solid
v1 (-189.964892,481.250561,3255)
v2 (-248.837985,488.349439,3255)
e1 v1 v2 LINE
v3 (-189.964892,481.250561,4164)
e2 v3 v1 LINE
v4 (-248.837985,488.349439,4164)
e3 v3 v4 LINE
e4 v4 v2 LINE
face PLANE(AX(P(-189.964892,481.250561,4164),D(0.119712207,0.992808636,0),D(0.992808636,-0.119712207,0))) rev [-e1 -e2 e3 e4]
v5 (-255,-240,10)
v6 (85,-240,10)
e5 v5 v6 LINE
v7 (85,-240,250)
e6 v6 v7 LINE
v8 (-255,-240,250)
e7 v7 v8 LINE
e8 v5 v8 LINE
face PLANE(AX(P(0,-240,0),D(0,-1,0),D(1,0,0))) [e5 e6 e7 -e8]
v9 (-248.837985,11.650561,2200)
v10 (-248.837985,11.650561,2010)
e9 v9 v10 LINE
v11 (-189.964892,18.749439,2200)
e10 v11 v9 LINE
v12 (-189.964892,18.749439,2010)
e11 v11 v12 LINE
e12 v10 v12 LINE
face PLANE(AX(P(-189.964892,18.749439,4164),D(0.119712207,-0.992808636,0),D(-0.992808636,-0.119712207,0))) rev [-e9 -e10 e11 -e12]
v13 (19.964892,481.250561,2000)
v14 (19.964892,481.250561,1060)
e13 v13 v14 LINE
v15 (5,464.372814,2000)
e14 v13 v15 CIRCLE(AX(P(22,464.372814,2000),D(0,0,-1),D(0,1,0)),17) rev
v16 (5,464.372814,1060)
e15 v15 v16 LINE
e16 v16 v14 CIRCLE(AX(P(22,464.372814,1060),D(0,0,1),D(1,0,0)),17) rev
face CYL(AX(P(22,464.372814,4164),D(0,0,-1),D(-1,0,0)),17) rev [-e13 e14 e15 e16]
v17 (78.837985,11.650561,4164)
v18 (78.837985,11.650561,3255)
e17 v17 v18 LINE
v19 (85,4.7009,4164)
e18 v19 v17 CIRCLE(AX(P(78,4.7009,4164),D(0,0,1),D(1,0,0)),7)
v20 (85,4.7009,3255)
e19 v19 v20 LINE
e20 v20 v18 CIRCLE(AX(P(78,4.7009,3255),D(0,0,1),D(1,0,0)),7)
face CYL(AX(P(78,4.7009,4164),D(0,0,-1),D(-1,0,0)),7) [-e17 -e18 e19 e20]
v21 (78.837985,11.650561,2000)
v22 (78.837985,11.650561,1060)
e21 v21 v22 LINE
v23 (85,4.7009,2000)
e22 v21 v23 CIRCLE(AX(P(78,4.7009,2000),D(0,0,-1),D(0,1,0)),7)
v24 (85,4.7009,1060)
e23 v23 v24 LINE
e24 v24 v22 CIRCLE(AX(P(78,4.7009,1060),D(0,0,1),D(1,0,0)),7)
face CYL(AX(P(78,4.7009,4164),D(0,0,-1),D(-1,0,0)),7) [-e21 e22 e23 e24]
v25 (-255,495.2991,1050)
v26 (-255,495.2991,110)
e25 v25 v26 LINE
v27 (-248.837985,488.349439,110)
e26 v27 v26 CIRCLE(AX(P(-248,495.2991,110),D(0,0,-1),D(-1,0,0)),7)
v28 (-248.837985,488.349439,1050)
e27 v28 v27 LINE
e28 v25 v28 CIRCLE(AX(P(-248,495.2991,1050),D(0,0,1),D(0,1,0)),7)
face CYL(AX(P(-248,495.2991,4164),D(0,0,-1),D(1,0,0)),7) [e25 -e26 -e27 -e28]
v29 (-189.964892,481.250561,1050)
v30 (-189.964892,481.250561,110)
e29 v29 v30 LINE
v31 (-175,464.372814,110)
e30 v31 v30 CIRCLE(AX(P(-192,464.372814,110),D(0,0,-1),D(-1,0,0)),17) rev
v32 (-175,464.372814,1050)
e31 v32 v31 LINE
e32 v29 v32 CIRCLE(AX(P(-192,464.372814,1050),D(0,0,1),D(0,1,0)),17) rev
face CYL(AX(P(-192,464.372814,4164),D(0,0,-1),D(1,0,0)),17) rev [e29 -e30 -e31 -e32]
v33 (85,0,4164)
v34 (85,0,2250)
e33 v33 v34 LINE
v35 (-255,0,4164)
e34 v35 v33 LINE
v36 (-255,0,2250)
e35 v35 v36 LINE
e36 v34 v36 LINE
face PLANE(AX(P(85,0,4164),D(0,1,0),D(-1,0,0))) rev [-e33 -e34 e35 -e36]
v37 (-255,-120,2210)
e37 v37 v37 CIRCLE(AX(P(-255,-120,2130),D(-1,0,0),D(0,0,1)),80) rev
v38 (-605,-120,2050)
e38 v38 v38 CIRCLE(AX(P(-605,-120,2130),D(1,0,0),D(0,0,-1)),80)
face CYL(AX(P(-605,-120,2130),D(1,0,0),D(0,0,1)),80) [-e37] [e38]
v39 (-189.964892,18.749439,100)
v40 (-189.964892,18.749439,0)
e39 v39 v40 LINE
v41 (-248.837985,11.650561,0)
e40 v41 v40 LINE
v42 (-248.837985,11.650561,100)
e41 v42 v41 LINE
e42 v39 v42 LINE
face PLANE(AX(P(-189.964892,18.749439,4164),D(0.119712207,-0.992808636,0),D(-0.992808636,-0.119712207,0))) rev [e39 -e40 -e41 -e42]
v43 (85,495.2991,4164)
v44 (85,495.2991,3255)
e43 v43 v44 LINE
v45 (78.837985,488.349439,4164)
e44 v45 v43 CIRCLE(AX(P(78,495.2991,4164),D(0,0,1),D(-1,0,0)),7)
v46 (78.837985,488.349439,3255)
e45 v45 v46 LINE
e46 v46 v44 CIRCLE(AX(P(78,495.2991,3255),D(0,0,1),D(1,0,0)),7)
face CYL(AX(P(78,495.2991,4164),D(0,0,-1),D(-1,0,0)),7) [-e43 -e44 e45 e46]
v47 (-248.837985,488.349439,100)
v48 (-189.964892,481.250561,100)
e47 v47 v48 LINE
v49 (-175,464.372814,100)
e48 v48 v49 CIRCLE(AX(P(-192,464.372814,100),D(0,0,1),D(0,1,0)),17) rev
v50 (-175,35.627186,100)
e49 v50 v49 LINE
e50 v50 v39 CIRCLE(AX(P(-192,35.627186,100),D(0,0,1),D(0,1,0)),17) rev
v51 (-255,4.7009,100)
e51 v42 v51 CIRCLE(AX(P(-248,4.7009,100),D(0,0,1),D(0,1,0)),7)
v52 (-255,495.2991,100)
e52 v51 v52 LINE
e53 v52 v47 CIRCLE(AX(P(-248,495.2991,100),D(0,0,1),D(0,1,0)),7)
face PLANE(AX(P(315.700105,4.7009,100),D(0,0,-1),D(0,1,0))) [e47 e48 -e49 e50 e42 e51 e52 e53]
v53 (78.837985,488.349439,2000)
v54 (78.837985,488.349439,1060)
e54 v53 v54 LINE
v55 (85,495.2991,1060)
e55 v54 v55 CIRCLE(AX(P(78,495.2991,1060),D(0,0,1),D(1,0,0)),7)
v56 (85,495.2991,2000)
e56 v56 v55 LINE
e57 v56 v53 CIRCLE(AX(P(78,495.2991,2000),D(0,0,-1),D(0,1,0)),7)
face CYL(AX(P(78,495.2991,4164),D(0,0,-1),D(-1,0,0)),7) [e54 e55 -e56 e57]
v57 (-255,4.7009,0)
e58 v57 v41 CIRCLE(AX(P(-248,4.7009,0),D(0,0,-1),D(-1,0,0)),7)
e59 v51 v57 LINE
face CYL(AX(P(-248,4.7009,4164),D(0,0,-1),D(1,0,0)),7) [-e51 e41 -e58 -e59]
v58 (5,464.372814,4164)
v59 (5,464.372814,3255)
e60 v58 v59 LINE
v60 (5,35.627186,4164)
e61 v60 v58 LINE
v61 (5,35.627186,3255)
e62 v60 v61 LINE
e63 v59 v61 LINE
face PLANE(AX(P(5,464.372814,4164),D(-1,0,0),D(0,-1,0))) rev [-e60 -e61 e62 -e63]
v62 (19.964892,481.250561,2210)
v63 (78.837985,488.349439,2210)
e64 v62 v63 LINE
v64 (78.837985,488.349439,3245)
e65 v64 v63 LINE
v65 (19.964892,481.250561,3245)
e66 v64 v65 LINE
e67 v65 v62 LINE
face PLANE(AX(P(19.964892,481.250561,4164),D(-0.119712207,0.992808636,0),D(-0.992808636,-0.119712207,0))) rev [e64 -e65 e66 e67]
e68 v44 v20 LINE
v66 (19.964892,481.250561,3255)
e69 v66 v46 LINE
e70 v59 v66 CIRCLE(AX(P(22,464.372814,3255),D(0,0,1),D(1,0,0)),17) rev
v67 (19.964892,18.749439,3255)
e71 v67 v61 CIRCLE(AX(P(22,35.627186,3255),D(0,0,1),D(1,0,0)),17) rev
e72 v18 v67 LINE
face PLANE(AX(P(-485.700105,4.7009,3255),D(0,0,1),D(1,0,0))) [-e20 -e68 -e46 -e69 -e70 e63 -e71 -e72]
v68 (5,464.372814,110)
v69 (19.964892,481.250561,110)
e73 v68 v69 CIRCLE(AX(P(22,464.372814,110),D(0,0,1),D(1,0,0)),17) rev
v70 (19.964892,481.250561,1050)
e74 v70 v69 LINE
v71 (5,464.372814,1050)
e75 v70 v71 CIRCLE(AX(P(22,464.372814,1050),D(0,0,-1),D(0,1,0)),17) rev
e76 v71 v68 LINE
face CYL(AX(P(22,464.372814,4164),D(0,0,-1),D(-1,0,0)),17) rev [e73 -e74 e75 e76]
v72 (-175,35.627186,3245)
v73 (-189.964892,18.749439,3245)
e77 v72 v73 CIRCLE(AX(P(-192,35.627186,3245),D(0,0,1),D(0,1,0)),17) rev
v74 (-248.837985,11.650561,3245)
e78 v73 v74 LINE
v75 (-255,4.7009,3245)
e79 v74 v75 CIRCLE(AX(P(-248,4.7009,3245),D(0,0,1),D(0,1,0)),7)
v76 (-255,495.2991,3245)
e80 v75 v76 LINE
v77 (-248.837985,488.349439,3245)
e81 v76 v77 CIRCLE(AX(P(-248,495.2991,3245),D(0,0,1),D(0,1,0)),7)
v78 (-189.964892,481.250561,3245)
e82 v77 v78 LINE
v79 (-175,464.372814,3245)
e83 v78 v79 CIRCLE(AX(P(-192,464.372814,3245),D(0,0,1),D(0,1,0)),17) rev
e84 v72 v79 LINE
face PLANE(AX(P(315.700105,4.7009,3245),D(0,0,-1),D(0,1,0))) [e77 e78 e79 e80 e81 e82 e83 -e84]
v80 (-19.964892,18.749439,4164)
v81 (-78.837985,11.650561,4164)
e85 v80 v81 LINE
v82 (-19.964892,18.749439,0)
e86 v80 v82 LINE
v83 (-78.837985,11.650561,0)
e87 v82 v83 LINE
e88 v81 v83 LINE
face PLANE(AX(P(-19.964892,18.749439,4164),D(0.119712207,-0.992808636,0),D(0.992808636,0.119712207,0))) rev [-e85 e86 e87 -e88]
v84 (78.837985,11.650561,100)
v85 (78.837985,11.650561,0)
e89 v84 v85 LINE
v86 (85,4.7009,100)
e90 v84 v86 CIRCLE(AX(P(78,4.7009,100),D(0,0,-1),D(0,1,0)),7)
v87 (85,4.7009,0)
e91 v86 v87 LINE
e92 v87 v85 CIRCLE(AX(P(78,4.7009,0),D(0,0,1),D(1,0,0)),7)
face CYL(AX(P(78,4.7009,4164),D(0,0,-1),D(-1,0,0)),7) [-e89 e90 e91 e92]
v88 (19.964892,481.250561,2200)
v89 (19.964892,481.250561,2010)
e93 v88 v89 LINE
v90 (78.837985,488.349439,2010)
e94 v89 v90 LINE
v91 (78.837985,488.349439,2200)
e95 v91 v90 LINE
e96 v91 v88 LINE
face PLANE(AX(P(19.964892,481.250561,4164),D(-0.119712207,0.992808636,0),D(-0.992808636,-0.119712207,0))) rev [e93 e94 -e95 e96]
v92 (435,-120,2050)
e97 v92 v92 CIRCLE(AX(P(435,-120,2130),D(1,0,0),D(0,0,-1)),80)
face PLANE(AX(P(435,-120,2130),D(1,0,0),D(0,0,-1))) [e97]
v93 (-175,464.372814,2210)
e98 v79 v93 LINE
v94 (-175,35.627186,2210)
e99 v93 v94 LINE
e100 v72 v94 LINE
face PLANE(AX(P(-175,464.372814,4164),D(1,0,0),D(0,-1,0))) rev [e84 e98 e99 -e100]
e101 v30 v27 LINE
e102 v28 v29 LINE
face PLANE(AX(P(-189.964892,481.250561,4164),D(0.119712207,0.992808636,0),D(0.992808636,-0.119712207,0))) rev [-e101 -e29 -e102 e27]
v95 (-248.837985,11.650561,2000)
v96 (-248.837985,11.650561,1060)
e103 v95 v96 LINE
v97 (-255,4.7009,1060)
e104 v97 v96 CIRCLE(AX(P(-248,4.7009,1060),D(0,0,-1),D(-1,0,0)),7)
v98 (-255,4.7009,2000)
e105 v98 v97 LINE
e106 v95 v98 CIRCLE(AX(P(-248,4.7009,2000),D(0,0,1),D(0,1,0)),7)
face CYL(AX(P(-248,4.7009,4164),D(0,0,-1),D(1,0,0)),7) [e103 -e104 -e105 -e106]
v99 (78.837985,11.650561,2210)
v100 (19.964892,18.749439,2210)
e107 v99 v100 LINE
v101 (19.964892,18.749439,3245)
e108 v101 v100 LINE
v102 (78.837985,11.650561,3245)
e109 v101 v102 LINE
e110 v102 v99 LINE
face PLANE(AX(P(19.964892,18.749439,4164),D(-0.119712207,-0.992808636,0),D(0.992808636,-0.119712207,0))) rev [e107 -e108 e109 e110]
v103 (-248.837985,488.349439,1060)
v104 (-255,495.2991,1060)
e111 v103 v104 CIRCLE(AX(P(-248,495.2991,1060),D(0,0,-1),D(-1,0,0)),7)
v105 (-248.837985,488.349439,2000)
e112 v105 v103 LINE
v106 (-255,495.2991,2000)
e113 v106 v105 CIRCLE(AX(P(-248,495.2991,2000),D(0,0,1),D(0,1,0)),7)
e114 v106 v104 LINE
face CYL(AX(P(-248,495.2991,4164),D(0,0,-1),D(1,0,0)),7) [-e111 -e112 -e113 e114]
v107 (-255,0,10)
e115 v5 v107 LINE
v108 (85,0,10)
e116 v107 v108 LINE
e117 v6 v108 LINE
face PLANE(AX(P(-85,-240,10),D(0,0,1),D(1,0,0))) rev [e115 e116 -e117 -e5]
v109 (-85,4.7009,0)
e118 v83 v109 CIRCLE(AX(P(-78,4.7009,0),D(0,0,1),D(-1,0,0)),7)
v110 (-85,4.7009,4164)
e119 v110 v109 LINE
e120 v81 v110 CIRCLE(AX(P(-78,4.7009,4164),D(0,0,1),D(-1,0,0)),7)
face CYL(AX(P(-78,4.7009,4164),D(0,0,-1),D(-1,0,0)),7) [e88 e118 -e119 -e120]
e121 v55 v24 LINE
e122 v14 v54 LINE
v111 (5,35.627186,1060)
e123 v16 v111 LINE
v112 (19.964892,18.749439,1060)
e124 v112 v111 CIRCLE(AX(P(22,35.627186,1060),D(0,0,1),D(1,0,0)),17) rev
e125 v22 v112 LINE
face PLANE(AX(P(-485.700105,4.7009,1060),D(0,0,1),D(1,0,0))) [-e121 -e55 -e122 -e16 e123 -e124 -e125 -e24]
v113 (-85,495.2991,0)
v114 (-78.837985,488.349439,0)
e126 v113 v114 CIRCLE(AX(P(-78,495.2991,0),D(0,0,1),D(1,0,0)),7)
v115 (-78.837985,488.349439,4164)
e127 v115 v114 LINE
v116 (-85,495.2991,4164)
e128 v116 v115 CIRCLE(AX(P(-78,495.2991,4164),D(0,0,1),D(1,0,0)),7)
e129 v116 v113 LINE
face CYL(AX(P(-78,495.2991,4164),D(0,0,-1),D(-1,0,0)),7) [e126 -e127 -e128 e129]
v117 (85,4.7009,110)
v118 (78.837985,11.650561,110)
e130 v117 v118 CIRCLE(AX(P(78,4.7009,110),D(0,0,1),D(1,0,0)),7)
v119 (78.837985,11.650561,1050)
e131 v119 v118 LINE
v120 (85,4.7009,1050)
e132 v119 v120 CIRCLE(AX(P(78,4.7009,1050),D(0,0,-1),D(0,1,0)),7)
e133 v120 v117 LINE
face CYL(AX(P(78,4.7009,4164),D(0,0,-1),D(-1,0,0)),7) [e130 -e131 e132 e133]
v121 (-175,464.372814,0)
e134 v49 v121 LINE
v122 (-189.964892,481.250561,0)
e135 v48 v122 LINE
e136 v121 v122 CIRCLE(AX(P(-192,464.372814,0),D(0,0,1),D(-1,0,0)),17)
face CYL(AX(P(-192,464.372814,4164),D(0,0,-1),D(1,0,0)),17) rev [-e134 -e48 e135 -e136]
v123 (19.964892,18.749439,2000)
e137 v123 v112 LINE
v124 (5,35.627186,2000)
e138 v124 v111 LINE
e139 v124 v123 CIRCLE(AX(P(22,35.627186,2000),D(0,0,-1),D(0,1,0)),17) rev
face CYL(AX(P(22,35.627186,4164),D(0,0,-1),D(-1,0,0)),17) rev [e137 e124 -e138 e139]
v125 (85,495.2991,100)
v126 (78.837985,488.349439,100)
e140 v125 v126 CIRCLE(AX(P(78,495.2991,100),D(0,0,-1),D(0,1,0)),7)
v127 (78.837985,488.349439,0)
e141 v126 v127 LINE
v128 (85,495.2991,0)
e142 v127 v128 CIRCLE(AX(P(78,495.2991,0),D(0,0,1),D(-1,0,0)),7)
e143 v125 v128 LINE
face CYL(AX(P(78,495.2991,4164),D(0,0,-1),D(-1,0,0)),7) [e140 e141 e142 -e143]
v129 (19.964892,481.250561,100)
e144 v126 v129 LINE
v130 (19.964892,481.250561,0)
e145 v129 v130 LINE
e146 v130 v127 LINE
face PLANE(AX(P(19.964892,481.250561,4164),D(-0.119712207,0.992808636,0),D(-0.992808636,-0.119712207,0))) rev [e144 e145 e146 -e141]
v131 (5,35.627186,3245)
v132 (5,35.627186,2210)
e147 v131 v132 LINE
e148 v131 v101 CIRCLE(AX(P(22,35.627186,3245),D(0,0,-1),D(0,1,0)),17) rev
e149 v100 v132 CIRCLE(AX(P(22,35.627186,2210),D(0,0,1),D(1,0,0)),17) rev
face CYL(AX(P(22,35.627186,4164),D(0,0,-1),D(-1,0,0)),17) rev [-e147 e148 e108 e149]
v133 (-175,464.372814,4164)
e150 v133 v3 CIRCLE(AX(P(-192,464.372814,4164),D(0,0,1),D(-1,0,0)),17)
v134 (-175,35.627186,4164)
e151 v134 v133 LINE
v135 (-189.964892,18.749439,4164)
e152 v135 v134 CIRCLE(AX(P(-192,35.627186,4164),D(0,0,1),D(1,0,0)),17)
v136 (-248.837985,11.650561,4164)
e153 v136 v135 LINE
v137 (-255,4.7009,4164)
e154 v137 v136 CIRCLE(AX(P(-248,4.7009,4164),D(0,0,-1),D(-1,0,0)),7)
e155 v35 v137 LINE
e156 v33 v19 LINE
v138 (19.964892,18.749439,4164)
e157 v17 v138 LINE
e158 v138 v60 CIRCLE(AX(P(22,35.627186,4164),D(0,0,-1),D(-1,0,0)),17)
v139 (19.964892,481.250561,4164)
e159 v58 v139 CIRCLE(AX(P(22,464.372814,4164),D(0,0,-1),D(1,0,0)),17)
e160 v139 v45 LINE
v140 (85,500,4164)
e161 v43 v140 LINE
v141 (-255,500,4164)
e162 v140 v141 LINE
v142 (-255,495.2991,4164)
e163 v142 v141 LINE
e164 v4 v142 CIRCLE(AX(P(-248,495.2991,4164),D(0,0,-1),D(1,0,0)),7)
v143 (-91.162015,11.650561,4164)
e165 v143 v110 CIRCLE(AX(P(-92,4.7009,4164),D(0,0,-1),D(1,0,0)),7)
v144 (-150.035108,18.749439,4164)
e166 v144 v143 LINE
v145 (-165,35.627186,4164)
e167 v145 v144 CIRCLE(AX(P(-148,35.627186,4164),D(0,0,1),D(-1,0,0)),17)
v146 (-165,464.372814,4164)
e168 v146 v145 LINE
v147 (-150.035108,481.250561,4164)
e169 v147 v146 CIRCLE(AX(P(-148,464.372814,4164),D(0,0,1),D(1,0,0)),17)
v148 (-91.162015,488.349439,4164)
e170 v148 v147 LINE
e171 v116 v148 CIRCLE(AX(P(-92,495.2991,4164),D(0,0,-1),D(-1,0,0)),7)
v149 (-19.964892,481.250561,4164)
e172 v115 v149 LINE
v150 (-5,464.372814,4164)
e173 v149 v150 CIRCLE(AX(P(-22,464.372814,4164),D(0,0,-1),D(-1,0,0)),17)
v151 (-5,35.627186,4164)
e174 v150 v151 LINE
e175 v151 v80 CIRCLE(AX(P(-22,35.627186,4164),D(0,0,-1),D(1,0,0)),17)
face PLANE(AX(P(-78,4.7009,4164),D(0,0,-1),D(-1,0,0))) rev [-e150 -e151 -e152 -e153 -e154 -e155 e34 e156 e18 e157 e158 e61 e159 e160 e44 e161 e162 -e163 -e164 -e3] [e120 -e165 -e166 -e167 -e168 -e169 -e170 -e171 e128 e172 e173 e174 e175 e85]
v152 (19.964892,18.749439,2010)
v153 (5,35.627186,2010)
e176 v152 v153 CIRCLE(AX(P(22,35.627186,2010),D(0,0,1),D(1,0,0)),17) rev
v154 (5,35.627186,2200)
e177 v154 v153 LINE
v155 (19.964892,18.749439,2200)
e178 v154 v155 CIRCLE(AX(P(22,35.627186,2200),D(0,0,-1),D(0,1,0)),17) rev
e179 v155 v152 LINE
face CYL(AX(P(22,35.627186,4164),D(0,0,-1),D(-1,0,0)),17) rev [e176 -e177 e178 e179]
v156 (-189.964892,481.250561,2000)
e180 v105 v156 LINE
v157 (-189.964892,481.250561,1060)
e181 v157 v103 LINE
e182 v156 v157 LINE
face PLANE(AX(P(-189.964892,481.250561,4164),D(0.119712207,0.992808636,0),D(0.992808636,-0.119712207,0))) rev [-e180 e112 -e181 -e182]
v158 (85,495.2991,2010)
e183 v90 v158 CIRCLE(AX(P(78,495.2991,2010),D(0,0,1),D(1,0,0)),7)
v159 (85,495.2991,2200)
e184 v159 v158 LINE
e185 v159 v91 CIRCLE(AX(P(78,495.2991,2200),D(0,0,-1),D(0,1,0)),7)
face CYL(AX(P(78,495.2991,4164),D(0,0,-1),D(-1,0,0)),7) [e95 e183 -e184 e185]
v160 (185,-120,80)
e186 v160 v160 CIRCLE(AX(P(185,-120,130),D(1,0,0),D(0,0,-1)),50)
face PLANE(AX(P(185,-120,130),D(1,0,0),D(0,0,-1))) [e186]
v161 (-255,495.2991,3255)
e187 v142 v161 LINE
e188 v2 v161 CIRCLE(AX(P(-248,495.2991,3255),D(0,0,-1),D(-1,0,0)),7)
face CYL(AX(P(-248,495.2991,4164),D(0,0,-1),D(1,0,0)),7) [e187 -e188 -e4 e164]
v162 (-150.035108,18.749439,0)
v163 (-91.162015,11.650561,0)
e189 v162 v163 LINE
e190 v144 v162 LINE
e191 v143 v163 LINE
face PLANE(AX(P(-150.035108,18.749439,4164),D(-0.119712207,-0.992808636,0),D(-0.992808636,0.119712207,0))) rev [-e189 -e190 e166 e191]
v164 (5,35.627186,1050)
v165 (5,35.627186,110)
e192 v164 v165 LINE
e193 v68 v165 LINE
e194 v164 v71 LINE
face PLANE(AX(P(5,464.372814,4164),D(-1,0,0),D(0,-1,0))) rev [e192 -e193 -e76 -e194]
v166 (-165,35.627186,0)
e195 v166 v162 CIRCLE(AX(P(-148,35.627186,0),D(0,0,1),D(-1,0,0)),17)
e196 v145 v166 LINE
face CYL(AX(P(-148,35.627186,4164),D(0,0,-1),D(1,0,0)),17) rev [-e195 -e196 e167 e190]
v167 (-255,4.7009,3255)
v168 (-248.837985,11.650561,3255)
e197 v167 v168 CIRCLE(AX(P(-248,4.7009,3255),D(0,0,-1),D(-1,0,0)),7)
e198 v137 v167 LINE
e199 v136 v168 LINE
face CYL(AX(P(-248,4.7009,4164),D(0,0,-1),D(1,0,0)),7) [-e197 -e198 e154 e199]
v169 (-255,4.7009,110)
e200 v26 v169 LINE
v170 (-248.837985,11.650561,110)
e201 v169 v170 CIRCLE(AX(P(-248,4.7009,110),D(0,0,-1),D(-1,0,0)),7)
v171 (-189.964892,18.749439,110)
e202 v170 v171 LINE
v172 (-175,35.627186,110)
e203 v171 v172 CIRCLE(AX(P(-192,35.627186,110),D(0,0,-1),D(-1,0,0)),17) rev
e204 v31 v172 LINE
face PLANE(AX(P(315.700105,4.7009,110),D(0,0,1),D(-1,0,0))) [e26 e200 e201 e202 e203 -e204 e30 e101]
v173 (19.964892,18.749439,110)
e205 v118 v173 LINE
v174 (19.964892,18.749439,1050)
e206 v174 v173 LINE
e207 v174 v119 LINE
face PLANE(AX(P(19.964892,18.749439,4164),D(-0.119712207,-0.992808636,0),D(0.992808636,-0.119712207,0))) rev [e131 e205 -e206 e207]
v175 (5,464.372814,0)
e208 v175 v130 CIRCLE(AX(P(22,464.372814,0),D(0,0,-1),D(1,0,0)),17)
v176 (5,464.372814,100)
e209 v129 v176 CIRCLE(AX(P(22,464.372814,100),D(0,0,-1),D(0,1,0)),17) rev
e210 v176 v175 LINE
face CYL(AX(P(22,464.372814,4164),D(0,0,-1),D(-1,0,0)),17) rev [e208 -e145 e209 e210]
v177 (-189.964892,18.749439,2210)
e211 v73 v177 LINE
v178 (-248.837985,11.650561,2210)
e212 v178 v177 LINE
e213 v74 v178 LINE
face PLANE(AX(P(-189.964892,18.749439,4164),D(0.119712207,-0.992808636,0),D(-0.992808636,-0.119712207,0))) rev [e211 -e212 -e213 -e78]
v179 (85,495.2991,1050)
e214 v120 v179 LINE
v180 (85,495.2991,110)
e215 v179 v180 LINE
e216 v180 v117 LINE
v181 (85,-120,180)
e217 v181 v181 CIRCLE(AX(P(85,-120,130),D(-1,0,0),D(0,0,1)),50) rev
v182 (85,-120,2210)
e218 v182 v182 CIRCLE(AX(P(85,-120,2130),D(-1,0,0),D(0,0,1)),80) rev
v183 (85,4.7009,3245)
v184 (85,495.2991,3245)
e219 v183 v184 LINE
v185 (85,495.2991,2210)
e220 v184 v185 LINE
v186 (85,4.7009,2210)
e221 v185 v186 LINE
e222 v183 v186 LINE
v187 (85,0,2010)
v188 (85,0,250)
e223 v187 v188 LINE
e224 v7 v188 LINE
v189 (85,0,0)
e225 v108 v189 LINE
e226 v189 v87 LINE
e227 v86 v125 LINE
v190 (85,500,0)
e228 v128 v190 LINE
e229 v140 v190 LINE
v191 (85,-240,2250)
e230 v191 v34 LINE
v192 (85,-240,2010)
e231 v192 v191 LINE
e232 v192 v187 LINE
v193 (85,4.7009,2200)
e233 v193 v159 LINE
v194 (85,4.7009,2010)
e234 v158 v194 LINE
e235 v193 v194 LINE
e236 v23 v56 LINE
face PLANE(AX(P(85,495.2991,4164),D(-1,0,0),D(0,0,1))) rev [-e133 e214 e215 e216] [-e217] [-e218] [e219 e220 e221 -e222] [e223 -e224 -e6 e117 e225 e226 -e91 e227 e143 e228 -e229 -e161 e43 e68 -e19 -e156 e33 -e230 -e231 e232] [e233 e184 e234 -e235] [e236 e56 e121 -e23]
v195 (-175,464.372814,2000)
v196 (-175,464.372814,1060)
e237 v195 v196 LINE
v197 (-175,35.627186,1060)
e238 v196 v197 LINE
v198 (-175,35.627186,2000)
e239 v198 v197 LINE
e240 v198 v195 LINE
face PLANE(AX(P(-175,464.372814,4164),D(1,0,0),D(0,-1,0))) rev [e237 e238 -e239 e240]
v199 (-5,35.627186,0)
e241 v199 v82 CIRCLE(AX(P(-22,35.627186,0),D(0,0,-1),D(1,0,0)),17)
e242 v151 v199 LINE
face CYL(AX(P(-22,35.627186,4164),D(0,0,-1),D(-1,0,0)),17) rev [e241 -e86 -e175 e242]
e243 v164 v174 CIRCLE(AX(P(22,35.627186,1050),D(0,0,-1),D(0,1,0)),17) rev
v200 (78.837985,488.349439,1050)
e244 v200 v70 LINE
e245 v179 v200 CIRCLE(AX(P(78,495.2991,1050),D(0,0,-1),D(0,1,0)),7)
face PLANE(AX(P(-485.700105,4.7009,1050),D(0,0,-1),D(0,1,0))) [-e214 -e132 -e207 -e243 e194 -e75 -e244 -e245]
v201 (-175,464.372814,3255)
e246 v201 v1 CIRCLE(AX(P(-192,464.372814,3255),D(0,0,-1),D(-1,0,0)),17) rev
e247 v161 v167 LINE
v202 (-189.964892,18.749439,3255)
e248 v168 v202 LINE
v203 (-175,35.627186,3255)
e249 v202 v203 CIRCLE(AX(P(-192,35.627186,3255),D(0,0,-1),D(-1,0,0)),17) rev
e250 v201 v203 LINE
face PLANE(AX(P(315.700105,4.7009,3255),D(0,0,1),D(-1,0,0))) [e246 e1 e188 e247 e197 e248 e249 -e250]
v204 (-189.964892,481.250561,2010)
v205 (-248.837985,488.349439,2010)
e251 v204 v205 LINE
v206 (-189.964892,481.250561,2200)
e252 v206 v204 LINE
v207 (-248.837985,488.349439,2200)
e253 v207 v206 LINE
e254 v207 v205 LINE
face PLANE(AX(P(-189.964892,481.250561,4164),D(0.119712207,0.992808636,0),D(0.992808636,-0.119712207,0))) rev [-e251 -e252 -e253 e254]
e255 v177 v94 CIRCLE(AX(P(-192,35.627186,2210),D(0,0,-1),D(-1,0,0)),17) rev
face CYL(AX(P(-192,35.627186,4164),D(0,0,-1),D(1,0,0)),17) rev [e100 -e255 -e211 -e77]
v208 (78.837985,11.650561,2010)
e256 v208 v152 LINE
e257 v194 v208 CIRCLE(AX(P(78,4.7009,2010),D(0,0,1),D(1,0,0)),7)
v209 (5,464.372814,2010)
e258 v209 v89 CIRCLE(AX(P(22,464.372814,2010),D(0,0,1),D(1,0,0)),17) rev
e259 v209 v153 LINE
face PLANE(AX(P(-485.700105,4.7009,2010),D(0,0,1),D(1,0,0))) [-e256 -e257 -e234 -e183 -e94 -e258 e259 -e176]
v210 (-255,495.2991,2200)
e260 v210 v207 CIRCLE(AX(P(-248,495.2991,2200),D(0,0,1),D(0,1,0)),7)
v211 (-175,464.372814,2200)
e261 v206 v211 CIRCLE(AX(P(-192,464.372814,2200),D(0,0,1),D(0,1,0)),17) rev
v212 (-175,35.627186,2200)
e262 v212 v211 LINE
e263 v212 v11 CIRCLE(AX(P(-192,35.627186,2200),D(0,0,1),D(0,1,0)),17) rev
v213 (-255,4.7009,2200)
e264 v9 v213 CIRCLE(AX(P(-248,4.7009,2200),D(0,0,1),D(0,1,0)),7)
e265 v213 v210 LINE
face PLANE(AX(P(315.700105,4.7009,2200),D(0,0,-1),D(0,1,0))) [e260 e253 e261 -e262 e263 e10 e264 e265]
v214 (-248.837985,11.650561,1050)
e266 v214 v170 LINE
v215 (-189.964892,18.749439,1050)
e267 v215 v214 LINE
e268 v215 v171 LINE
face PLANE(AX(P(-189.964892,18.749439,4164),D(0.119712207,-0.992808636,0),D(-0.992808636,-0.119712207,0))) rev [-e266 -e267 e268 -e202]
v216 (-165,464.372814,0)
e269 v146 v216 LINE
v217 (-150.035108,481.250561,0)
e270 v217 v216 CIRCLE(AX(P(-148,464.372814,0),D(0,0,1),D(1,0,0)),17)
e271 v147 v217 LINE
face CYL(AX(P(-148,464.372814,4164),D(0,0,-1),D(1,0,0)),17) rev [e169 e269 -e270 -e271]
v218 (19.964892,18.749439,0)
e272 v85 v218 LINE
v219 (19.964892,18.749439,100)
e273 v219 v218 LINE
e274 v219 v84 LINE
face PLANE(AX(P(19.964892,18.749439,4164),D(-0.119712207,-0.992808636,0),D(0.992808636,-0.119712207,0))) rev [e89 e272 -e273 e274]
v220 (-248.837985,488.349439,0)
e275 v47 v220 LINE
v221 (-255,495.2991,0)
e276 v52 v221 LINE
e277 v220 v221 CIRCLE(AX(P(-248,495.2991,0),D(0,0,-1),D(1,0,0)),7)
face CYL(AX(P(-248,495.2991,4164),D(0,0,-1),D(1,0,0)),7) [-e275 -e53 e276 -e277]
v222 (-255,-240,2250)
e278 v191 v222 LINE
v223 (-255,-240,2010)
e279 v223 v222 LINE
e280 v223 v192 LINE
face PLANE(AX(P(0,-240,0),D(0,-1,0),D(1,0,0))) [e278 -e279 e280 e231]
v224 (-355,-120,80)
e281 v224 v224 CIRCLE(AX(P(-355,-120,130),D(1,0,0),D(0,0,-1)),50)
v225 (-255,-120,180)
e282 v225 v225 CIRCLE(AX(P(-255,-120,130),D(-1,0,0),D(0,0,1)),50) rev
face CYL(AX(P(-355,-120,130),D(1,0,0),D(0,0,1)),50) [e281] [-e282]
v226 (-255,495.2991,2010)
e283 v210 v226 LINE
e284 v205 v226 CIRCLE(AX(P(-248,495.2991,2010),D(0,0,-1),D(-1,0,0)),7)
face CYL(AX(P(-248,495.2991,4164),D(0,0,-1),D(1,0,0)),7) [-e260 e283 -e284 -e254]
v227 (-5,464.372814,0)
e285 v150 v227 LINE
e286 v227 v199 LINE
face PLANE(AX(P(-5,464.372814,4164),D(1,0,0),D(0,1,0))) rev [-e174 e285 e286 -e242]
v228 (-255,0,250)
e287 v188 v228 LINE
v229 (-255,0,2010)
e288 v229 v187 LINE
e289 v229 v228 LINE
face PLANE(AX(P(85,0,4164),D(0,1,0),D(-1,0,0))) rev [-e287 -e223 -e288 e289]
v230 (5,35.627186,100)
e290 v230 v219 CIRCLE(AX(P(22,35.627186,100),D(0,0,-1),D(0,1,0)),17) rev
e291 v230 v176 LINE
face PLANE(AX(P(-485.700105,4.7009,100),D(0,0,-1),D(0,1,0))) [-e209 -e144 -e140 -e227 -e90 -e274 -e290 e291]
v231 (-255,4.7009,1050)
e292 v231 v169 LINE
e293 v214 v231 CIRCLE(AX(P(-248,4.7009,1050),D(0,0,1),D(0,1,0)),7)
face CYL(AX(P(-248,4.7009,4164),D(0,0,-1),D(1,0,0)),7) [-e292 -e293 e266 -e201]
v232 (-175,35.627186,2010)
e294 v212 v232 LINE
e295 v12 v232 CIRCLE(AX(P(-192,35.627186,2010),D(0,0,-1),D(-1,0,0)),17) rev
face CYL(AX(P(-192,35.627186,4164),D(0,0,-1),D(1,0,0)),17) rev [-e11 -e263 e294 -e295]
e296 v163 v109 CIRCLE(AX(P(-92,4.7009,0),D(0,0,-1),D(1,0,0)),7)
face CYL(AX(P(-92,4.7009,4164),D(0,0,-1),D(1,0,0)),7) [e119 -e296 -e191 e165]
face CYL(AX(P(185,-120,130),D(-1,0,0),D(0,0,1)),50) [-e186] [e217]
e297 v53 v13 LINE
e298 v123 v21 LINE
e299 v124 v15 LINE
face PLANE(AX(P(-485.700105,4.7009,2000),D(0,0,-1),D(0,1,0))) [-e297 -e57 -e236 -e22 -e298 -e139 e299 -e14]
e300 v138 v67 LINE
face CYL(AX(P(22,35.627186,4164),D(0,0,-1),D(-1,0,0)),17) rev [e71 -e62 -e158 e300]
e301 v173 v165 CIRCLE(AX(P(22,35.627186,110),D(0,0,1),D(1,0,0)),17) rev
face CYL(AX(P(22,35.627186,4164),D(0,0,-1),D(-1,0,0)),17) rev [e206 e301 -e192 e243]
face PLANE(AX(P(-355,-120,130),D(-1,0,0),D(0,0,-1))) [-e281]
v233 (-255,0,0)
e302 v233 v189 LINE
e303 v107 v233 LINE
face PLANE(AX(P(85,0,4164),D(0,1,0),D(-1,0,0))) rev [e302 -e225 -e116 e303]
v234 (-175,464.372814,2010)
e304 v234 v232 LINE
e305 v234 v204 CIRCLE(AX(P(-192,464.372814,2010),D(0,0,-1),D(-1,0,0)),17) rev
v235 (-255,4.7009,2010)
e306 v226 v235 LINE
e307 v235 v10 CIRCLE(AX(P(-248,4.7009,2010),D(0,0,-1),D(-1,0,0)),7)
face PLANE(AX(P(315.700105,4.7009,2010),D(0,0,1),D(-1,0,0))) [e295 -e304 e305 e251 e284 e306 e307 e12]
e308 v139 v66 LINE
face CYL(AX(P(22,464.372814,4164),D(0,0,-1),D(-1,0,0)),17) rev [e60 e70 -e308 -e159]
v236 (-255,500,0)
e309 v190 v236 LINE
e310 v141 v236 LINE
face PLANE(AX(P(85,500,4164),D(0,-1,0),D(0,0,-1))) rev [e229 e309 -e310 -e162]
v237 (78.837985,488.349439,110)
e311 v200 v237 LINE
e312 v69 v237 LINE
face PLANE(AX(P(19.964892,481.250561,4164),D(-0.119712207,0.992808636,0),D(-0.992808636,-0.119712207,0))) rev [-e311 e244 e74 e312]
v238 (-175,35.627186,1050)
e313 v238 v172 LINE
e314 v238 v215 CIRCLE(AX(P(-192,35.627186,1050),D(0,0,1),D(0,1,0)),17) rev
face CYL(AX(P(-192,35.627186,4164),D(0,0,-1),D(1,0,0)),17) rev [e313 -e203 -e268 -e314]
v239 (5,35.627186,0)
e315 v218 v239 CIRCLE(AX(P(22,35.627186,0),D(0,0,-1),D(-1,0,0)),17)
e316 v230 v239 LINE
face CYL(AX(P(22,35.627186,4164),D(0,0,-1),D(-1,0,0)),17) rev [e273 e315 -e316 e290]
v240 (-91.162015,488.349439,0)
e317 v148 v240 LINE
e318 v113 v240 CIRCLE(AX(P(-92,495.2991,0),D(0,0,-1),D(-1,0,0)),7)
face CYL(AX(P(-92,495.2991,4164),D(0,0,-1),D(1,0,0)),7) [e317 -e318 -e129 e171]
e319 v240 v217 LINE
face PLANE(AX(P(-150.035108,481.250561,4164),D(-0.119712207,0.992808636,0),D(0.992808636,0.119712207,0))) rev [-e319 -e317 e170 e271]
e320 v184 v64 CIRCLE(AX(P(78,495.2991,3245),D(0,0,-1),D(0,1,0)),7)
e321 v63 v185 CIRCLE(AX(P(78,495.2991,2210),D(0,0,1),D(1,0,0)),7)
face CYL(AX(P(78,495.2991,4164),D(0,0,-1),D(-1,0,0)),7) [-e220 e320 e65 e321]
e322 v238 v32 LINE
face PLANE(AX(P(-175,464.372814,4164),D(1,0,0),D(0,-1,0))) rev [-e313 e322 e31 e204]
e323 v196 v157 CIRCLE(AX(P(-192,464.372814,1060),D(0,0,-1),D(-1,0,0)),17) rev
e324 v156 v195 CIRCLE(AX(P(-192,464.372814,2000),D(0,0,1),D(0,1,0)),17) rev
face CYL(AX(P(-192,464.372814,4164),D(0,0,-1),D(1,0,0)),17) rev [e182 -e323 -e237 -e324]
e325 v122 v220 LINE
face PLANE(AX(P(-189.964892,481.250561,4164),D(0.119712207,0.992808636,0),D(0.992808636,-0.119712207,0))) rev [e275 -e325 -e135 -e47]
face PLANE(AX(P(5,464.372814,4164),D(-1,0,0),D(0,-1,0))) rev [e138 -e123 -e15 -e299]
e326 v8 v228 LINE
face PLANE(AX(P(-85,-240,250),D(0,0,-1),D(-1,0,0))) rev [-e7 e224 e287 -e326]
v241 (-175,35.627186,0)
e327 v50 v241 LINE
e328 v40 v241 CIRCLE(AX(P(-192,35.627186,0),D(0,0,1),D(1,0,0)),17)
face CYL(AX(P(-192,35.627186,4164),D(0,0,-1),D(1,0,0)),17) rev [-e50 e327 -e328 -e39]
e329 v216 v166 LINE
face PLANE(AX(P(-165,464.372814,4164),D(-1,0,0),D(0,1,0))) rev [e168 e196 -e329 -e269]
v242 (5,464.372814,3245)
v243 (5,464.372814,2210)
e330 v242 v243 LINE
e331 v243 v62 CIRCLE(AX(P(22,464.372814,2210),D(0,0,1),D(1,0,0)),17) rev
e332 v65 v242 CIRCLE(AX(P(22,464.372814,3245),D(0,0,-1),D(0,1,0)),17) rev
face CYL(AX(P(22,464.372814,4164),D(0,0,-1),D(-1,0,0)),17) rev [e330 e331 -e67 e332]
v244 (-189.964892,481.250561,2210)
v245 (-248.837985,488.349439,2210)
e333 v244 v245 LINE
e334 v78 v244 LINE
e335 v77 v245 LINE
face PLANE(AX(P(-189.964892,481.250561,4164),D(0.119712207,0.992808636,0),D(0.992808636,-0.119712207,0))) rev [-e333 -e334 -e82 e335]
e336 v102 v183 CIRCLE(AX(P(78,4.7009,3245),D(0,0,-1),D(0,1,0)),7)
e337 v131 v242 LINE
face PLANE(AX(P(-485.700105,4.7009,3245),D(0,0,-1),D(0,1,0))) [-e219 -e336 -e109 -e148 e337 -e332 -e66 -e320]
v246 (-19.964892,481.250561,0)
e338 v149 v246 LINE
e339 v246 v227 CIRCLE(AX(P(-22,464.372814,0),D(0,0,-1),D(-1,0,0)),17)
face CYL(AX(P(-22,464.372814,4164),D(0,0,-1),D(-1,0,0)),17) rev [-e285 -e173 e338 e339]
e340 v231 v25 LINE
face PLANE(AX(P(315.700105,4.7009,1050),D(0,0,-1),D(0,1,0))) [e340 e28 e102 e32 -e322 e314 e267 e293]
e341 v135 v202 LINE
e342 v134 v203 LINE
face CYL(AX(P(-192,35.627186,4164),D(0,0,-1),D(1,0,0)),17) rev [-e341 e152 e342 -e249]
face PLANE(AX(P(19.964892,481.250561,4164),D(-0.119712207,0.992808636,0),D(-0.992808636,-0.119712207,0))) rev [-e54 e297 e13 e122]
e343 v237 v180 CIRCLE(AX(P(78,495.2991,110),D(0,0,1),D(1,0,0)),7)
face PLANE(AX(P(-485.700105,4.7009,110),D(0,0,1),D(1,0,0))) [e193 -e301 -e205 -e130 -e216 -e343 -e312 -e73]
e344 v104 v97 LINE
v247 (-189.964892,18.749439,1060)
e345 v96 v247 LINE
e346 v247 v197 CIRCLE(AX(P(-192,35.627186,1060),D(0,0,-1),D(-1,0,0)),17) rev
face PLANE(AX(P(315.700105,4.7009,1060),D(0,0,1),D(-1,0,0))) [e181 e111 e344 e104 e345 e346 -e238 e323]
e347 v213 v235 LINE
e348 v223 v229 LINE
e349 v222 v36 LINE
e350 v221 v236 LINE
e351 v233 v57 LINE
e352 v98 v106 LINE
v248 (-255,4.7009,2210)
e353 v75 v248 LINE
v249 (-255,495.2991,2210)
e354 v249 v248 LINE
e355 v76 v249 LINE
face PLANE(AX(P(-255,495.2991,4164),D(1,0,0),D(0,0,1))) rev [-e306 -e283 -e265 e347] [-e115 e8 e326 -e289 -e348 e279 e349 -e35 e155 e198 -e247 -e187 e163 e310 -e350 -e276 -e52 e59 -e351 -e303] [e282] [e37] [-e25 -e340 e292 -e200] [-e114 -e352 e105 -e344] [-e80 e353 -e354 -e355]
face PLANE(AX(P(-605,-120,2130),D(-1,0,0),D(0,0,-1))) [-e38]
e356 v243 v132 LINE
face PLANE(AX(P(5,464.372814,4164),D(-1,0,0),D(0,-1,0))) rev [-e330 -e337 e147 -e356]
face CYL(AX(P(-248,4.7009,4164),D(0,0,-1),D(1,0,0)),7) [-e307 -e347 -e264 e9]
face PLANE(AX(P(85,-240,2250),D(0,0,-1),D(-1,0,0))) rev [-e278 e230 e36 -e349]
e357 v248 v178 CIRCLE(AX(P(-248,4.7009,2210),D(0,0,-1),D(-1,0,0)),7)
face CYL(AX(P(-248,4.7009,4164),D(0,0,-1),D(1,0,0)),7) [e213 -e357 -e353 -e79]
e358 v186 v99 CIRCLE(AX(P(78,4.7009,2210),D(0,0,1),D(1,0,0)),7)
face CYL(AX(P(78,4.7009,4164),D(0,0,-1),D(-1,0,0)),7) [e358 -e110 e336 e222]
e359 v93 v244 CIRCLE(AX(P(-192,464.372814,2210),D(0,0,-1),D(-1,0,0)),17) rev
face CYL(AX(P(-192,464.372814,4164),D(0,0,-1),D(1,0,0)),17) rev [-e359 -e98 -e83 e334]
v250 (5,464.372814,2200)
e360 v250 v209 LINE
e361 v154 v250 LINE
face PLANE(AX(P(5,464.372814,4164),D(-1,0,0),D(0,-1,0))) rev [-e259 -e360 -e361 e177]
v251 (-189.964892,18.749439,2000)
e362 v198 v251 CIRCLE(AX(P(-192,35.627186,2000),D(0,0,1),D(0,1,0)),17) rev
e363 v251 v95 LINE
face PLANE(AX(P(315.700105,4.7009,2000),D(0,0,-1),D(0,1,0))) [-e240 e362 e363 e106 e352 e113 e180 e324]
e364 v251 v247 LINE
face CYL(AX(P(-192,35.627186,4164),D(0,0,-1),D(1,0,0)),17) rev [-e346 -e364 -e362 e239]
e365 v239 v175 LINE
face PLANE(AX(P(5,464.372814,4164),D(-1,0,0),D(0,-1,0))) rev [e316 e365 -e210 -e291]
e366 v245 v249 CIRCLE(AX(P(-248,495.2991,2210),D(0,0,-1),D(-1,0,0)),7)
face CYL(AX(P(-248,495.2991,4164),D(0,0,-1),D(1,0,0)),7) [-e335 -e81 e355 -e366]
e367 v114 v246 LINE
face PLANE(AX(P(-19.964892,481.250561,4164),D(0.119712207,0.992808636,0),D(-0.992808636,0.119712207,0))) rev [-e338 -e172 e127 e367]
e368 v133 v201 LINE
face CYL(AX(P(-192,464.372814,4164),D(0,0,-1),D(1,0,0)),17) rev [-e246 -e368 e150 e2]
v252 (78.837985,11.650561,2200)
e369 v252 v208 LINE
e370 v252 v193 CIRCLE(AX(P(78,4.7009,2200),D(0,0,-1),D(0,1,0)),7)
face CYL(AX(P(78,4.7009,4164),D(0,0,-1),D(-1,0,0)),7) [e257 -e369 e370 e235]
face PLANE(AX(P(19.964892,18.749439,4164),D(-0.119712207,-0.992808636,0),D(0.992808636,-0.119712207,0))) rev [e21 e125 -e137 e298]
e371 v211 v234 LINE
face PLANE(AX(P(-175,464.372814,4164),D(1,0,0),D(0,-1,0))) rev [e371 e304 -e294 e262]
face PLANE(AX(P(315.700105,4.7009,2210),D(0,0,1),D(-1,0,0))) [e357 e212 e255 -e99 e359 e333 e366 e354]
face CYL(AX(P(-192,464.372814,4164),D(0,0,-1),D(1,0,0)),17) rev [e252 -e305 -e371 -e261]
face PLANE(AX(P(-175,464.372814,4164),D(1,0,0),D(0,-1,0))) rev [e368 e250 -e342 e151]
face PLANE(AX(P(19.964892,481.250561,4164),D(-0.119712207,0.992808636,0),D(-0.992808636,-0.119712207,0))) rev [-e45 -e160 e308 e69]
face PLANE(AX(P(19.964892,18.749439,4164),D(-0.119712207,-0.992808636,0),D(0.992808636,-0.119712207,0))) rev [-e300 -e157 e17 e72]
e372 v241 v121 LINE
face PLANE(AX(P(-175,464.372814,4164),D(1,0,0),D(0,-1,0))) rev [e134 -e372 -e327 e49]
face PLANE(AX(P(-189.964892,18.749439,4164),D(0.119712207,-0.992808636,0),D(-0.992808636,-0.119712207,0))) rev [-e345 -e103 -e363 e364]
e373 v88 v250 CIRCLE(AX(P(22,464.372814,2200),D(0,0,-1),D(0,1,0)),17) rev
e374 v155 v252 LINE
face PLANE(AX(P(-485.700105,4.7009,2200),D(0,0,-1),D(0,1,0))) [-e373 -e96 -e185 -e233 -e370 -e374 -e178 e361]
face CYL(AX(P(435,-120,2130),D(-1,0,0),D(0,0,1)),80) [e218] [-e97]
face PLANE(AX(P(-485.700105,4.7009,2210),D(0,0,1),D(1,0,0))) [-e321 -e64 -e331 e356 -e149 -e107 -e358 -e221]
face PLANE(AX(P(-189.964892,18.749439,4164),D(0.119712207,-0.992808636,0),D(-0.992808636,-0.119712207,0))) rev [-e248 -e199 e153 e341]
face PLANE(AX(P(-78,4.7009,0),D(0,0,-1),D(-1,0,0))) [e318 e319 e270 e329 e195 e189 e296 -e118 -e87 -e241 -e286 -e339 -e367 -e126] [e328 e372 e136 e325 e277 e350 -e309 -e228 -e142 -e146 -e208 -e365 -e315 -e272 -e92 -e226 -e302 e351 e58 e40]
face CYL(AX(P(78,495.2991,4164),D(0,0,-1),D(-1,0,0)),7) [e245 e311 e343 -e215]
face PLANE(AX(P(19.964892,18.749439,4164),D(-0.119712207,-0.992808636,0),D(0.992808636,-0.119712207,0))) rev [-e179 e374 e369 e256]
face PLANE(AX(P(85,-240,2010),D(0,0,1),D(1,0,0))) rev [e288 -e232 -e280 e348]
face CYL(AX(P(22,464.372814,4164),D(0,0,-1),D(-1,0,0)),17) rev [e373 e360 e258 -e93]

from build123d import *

# Parameters (mm, degrees)
EXTRUDE_1136_DEPTH     = 4164
EXTRUDE_1_REACH        = 4199.356
SKETCH_1191_W          = 10
SKETCH_1191_H          = 490.598199432
PATTERN_LINEAR_1_COUNT = 3
PATTERN_LINEAR_1_PITCH = 950
PATTERN_LINEAR_2_COUNT = 2
PATTERN_LINEAR_2_PITCH = 2100
PATTERN_LINEAR_3_COUNT = 2
PATTERN_LINEAR_3_PITCH = 3145
SKETCH_1597_W          = 170
SKETCH_1597_H          = 240
EXTRUDE_1746_DEPTH     = 240
SKETCH_1801_R          = 80
EXTRUDE_2316_DEPTH     = 350
SKETCH_2358_W          = 170
SKETCH_2358_H          = 240
EXTRUDE_2517_DEPTH     = 240
SKETCH_2569_R          = 50
EXTRUDE_3116_DEPTH     = 100


# Read off the part's stored shape, not the designer's step: Дзеркальне відображення
with BuildPart() as part:
    # Sketch 696 → Extrude 1136 (new body)
    with BuildSketch(Plane.XY):
        with BuildLine():
            Line((5, 464.372813925), (5, 35.627186075))
            ThreePointArc((5, 35.627186075), (9.279999452, 24.348818017), (19.964892476, 18.749439265))
            Line((19.964892476, 18.749439265), (78.837985451, 11.650560735))
            ThreePointArc((78.837985451, 11.650560735), (83.237647285, 9.34493419), (85, 4.700900284))
            Line((85, 4.700900284), (85, 0))
            Line((85, 0), (-85, 0))
            Line((-85, 0), (-85, 4.700900284))
            ThreePointArc((-85, 4.700900284), (-83.237647285, 9.34493419), (-78.837985451, 11.650560735))
            Line((-78.837985451, 11.650560735), (-19.964892476, 18.749439265))
            ThreePointArc((-19.964892476, 18.749439265), (-9.279999452, 24.348818017), (-5, 35.627186075))
            Line((-5, 35.627186075), (-5, 464.372813925))
            ThreePointArc((-5, 464.372813925), (-9.279999452, 475.651181983), (-19.964892476, 481.250560735))
            Line((-19.964892476, 481.250560735), (-78.837985451, 488.349439265))
            ThreePointArc((-78.837985451, 488.349439265), (-83.237647285, 490.65506581), (-85, 495.299099716))
            Line((-85, 495.299099716), (-85, 500))
            Line((-85, 500), (85, 500))
            Line((85, 500), (85, 495.299099716))
            ThreePointArc((85, 495.299099716), (83.237647285, 490.65506581), (78.837985451, 488.349439265))
            Line((78.837985451, 488.349439265), (19.964892476, 481.250560735))
            ThreePointArc((19.964892476, 481.250560735), (9.279999452, 475.651181983), (5, 464.372813925))
        make_face()
    extrude(amount=EXTRUDE_1136_DEPTH)

    # Ребро1: up to this face of the body (flat: up to its plane)
    extrude_1_end = Plane(part.part.faces().sort_by_distance((5, 250, 2082))[0])
    # Sketch 1191 → Ребро1 (add, up to the picked face)
    with BuildSketch(Plane(origin=(85, 0, 0), x_dir=(0, 0, -1), z_dir=(1, 0, 0)), mode=Mode.PRIVATE) as extrude_1_sk1:
        with Locations((-105, 250)):
            Rectangle(SKETCH_1191_W, SKETCH_1191_H)
    extrude_1_tool1 = split(extrude(extrude_1_sk1.sketch, amount=-EXTRUDE_1_REACH, mode=Mode.PRIVATE), bisect_by=extrude_1_end, keep=Keep.BOTH, mode=Mode.PRIVATE)
    extrude_1 = extrude_1_tool1.solids().sort_by(Axis((85, 250, 105), (-1, 0, 0)))[0]
    add(extrude_1)

    # Масив ребер1: Ребро1 ×3
    with Locations(*[(0, 0, i * PATTERN_LINEAR_1_PITCH) for i in range(1, PATTERN_LINEAR_1_COUNT)]):
        add(extrude_1)

    # Масив ребер2: Ребро1 ×2
    with Locations(*[(0, 0, i * PATTERN_LINEAR_2_PITCH) for i in range(1, PATTERN_LINEAR_2_COUNT)]):
        add(extrude_1)

    # Масив ребер3: Ребро1 ×2
    with Locations(*[(0, 0, i * PATTERN_LINEAR_3_PITCH) for i in range(1, PATTERN_LINEAR_3_COUNT)]):
        add(extrude_1)

    # Sketch 1597 → Extrude 1746 (add)
    with BuildSketch(Plane.XZ):
        with Locations((0, 2130)):
            Rectangle(SKETCH_1597_W, SKETCH_1597_H)
    extrude(amount=EXTRUDE_1746_DEPTH)

    # Sketch 1801 → Extrude 2316 (add)
    with BuildSketch(Plane(origin=(85, 0, 0), x_dir=(0, 0, -1), z_dir=(1, 0, 0))):
        with Locations(Location((-2130, -120, 0), (0, 0, 180))):
            Circle(SKETCH_1801_R)
    extrude(amount=EXTRUDE_2316_DEPTH)

    # Sketch 2358 → Extrude 2517 (add)
    with BuildSketch(Plane.XZ):
        with Locations((0, 130)):
            Rectangle(SKETCH_2358_W, SKETCH_2358_H)
    extrude(amount=EXTRUDE_2517_DEPTH)

    # Sketch 2569 → Extrude 3116 (add)
    with BuildSketch(Plane(origin=(85, 0, 0), x_dir=(0, 0, -1), z_dir=(1, 0, 0))):
        with Locations(Location((-130, -120, 0), (0, 0, 180))):
            Circle(SKETCH_2569_R)
    extrude(amount=EXTRUDE_3116_DEPTH)

    # Mirror 3159: part across plane


with BuildPart() as part_1:
    add(part.part)
    add(part.part.mirror(Plane(origin=(-85, 4.700900284, 4164), x_dir=(0, 0, 1), z_dir=(1, 0, 0))))


solid = part_1.part
